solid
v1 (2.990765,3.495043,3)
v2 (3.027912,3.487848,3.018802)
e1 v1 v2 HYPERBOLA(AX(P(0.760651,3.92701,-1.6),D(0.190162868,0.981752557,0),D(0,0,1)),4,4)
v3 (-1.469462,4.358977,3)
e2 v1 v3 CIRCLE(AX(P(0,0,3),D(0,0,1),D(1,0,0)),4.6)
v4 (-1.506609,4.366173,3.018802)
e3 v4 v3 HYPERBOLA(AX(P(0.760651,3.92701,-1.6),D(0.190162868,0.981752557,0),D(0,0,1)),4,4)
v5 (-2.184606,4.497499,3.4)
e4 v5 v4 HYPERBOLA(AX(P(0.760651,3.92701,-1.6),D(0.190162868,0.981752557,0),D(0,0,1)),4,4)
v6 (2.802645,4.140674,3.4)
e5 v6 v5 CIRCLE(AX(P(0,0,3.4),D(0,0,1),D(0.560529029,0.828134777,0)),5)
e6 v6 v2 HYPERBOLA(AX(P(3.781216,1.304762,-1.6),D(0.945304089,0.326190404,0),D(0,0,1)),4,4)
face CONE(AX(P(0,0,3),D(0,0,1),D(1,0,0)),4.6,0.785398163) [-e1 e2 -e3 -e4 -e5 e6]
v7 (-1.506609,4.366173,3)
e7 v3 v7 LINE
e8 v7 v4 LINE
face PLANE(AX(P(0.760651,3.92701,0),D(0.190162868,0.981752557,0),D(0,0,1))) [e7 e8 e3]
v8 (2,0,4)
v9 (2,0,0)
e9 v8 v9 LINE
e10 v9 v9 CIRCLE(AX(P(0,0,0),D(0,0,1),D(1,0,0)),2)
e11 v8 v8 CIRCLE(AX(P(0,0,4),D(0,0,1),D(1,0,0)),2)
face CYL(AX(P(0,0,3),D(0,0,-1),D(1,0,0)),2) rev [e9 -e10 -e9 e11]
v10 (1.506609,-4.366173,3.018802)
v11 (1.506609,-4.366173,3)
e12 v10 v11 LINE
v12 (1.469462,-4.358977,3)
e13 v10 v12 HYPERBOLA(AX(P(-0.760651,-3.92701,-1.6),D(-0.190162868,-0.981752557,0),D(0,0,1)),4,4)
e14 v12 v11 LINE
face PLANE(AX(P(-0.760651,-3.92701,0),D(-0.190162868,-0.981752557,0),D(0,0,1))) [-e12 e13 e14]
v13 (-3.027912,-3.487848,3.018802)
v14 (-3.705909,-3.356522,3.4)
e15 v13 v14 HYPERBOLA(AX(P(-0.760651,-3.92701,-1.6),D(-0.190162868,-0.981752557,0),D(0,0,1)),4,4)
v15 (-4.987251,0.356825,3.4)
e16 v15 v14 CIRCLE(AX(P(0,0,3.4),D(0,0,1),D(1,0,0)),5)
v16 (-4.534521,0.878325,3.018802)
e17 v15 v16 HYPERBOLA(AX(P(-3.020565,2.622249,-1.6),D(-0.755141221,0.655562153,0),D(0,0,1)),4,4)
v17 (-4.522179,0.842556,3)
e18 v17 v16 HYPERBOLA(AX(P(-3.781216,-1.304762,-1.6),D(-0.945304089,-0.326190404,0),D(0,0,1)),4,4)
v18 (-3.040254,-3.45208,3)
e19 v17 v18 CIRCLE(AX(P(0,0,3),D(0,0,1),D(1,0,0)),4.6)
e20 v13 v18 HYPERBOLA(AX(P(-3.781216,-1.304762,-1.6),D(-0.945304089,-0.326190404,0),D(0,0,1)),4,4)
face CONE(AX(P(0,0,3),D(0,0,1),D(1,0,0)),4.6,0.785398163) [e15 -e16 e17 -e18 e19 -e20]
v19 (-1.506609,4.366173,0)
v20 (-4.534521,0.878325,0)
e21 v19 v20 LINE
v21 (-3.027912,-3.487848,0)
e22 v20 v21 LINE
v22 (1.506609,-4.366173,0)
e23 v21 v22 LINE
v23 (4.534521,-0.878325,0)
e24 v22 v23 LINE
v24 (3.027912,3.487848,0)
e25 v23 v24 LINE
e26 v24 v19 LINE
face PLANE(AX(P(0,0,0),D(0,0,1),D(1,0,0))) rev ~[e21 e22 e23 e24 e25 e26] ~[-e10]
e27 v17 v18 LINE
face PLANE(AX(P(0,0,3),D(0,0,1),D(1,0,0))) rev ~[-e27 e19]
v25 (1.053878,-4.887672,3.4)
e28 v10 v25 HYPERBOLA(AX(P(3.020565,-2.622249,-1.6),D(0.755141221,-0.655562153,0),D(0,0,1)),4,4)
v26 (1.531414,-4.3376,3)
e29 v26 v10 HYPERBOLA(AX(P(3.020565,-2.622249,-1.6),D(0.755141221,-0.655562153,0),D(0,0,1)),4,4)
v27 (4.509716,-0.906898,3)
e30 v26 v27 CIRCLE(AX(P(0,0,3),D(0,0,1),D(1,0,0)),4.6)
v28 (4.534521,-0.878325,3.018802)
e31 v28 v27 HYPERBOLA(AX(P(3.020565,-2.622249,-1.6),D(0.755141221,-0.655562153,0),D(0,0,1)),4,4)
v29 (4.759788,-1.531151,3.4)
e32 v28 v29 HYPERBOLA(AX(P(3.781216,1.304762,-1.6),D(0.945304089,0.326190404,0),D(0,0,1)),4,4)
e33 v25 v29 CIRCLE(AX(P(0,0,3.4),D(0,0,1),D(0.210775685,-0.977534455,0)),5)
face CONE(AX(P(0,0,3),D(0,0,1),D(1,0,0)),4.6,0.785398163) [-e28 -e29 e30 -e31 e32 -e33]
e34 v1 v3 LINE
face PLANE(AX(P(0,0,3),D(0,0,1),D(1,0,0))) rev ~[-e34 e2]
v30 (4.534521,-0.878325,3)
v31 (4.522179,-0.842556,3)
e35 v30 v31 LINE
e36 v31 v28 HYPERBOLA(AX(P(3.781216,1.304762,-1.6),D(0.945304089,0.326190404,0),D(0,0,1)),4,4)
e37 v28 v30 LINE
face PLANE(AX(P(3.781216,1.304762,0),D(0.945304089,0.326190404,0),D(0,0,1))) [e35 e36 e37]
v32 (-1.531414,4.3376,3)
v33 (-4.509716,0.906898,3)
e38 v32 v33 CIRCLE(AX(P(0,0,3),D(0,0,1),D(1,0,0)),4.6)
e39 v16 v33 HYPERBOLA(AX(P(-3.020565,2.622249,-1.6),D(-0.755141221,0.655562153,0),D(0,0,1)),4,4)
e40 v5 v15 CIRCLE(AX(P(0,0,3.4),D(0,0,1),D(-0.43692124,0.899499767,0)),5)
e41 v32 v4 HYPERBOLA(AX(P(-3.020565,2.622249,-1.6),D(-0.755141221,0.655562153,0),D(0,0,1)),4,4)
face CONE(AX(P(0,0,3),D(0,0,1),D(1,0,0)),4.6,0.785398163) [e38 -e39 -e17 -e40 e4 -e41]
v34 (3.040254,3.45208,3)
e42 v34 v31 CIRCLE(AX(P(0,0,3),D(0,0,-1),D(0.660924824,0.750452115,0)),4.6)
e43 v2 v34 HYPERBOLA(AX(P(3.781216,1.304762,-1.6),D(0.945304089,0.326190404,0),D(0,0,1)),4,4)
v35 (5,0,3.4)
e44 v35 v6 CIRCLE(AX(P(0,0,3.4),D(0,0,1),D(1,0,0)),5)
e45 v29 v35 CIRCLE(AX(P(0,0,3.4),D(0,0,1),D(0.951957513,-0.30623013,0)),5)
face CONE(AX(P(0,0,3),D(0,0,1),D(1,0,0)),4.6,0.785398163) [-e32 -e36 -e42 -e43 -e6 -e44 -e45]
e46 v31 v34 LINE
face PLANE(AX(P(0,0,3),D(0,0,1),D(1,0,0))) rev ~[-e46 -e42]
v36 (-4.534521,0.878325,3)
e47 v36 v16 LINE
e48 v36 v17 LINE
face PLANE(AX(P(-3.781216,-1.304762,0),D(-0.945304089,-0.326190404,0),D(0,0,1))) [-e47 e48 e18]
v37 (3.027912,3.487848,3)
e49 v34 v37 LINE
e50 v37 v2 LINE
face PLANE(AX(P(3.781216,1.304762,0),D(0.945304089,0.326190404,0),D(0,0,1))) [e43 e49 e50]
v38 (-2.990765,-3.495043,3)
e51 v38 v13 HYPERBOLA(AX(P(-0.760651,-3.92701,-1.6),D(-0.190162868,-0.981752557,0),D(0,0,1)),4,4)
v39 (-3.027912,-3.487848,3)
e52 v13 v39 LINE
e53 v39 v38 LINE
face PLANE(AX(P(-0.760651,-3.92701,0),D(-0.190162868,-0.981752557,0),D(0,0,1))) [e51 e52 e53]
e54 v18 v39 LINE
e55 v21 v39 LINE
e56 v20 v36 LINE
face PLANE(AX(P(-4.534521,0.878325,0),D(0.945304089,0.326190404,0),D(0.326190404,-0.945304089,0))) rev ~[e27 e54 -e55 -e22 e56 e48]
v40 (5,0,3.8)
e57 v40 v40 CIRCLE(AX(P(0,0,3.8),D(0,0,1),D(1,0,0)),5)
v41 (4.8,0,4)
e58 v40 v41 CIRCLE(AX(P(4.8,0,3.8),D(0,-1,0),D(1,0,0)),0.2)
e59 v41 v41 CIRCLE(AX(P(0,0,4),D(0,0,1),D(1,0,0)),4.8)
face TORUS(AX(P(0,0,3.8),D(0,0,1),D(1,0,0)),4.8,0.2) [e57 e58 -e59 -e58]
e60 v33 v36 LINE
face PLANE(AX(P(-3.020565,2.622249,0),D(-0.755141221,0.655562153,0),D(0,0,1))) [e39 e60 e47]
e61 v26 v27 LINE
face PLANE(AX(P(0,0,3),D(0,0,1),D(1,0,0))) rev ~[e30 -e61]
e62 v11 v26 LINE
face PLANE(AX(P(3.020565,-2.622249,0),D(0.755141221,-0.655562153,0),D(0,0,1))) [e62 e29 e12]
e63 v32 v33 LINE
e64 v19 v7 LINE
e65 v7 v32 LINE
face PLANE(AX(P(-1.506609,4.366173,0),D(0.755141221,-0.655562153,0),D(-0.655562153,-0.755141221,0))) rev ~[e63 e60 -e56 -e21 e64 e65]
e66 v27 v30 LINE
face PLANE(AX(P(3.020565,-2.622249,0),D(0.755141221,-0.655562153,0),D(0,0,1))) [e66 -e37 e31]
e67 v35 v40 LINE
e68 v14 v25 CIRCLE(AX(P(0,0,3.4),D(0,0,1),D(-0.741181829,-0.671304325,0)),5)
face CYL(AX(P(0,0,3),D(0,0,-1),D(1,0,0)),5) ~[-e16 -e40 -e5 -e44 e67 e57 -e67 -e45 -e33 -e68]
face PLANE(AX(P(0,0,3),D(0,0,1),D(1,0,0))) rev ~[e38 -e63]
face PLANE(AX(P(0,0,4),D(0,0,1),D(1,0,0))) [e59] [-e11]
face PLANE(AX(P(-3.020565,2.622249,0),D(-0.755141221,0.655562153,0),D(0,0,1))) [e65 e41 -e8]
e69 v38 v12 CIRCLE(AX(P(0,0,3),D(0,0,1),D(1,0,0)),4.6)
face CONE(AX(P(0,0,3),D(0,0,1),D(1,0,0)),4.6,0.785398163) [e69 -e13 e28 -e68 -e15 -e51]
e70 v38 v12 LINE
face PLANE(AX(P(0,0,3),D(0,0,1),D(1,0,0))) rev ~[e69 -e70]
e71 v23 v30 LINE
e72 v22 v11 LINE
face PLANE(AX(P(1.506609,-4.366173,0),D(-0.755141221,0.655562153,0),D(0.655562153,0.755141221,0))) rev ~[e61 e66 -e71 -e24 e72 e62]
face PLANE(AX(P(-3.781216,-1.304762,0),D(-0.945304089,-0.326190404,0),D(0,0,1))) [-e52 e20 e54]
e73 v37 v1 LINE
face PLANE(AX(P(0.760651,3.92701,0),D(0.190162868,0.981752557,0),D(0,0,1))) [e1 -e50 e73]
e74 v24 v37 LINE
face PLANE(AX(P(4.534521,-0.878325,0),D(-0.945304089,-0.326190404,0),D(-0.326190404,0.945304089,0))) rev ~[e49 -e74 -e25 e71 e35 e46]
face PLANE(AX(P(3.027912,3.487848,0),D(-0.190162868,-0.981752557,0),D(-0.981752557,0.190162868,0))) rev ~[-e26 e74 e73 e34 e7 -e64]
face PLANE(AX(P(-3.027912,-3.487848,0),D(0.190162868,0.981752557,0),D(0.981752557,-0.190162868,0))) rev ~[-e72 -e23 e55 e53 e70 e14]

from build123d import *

# Parameters (mm, degrees)
F0_R     = 2
F1_DEPTH = 3
F2_R     = 5
F2_R_2   = 2
F3_DEPTH = 1
F5_R     = 0.2


# Not quite as in the source:
# - a fillet or chamfer that OpenCascade refuses, or shapes differently, is made with other operations: its cross-section is extruded or revolved along the edge and cut away or added


with BuildPart() as f1:
    # F0 (on Top) → F1 (new body)
    with BuildSketch(Plane.XY):
        Polygon((1.5066089403, -4.3661725612), (4.5345208255, -0.8783246648), (3.0279118852, 3.4878478965), (-1.5066089403, 4.3661725612), (-4.5345208255, 0.8783246648), (-3.0279118852, -3.4878478965), align=None)
        Circle(F0_R, mode=Mode.SUBTRACT)
    extrude(amount=F1_DEPTH)

    # F2 (on face) → F3 (join)
    with BuildSketch(Plane.XY.offset(3)):
        Circle(F2_R)
        Circle(F2_R_2, mode=Mode.SUBTRACT)
    extrude(amount=F3_DEPTH)

    # F4: chamfer of 0.4 on 1 edges, made by hand


with BuildPart() as f4_tool2:
    # F4_s3 → F4_t4 (revolve)
    with BuildSketch(Plane.XZ):
        Polygon((4.6, 3), (5, 3.4), (5, 3), align=None)
    revolve(axis=Axis((0, 0, 3), (0, 0, 1)))

    split(bisect_by=Plane(origin=(3.7812163553, 1.3047616158, 0), x_dir=(0, 0, 1), z_dir=(0.9453040888, 0.326190404, 0)), keep=Keep.TOP)


with BuildPart() as f1_1:
    add(f1.part)

    # F4_t1: cut F4_tool2
    add(f4_tool2.part, mode=Mode.SUBTRACT)


with BuildPart() as f4_tool7:
    # F4_s8 → F4_t9 (revolve)
    with BuildSketch(Plane.XZ):
        Polygon((4.6, 3), (5, 3.4), (5, 3), align=None)
    revolve(axis=Axis((0, 0, 3), (0, 0, 1)))

    split(bisect_by=Plane(origin=(0.7606514725, 3.9270102288, 0), x_dir=(0, 0, 1), z_dir=(0.1901628681, 0.9817525572, 0)), keep=Keep.TOP)


with BuildPart() as f1_2:
    add(f1_1.part)

    # F4_t6: cut F4_tool7
    add(f4_tool7.part, mode=Mode.SUBTRACT)


with BuildPart() as f4_tool12:
    # F4_s13 → F4_t14 (revolve)
    with BuildSketch(Plane.XZ):
        Polygon((4.6, 3), (5, 3.4), (5, 3), align=None)
    revolve(axis=Axis((0, 0, 3), (0, 0, 1)))

    split(bisect_by=Plane(origin=(3.0205648829, -2.622248613, 0), x_dir=(0, 0, 1), z_dir=(0.7551412207, -0.6555621532, 0)), keep=Keep.TOP)


with BuildPart() as f1_3:
    add(f1_2.part)

    # F4_t11: cut F4_tool12
    add(f4_tool12.part, mode=Mode.SUBTRACT)


with BuildPart() as f4_tool17:
    # F4_s18 → F4_t19 (revolve)
    with BuildSketch(Plane.XZ):
        Polygon((4.6, 3), (5, 3.4), (5, 3), align=None)
    revolve(axis=Axis((0, 0, 3), (0, 0, 1)))

    split(bisect_by=Plane(origin=(-3.0205648829, 2.622248613, 0), x_dir=(0, 0, 1), z_dir=(-0.7551412207, 0.6555621532, 0)), keep=Keep.TOP)


with BuildPart() as f1_4:
    add(f1_3.part)

    # F4_t16: cut F4_tool17
    add(f4_tool17.part, mode=Mode.SUBTRACT)


with BuildPart() as f4_tool22:
    # F4_s23 → F4_t24 (revolve)
    with BuildSketch(Plane.XZ):
        Polygon((4.6, 3), (5, 3.4), (5, 3), align=None)
    revolve(axis=Axis((0, 0, 3), (0, 0, 1)))

    split(bisect_by=Plane(origin=(-0.7606514725, -3.9270102288, 0), x_dir=(0, 0, 1), z_dir=(-0.1901628681, -0.9817525572, 0)), keep=Keep.TOP)


with BuildPart() as f1_5:
    add(f1_4.part)

    # F4_t21: cut F4_tool22
    add(f4_tool22.part, mode=Mode.SUBTRACT)


with BuildPart() as f4_tool27:
    # F4_s28 → F4_t29 (revolve)
    with BuildSketch(Plane.XZ):
        Polygon((4.6, 3), (5, 3.4), (5, 3), align=None)
    revolve(axis=Axis((0, 0, 3), (0, 0, 1)))

    split(bisect_by=Plane(origin=(-3.7812163553, -1.3047616158, 0), x_dir=(0, 0, 1), z_dir=(-0.9453040888, -0.326190404, 0)), keep=Keep.TOP)


with BuildPart() as f1_6:
    add(f1_5.part)

    # F4_t26: cut F4_tool27
    add(f4_tool27.part, mode=Mode.SUBTRACT)

    # F5
    f5_edges = [f1_6.edges().sort_by_distance(p)[0] for p in [
        (-5, 0, 4),
    ]]
    fillet(f5_edges, radius=F5_R)


solid = f1_6.part
